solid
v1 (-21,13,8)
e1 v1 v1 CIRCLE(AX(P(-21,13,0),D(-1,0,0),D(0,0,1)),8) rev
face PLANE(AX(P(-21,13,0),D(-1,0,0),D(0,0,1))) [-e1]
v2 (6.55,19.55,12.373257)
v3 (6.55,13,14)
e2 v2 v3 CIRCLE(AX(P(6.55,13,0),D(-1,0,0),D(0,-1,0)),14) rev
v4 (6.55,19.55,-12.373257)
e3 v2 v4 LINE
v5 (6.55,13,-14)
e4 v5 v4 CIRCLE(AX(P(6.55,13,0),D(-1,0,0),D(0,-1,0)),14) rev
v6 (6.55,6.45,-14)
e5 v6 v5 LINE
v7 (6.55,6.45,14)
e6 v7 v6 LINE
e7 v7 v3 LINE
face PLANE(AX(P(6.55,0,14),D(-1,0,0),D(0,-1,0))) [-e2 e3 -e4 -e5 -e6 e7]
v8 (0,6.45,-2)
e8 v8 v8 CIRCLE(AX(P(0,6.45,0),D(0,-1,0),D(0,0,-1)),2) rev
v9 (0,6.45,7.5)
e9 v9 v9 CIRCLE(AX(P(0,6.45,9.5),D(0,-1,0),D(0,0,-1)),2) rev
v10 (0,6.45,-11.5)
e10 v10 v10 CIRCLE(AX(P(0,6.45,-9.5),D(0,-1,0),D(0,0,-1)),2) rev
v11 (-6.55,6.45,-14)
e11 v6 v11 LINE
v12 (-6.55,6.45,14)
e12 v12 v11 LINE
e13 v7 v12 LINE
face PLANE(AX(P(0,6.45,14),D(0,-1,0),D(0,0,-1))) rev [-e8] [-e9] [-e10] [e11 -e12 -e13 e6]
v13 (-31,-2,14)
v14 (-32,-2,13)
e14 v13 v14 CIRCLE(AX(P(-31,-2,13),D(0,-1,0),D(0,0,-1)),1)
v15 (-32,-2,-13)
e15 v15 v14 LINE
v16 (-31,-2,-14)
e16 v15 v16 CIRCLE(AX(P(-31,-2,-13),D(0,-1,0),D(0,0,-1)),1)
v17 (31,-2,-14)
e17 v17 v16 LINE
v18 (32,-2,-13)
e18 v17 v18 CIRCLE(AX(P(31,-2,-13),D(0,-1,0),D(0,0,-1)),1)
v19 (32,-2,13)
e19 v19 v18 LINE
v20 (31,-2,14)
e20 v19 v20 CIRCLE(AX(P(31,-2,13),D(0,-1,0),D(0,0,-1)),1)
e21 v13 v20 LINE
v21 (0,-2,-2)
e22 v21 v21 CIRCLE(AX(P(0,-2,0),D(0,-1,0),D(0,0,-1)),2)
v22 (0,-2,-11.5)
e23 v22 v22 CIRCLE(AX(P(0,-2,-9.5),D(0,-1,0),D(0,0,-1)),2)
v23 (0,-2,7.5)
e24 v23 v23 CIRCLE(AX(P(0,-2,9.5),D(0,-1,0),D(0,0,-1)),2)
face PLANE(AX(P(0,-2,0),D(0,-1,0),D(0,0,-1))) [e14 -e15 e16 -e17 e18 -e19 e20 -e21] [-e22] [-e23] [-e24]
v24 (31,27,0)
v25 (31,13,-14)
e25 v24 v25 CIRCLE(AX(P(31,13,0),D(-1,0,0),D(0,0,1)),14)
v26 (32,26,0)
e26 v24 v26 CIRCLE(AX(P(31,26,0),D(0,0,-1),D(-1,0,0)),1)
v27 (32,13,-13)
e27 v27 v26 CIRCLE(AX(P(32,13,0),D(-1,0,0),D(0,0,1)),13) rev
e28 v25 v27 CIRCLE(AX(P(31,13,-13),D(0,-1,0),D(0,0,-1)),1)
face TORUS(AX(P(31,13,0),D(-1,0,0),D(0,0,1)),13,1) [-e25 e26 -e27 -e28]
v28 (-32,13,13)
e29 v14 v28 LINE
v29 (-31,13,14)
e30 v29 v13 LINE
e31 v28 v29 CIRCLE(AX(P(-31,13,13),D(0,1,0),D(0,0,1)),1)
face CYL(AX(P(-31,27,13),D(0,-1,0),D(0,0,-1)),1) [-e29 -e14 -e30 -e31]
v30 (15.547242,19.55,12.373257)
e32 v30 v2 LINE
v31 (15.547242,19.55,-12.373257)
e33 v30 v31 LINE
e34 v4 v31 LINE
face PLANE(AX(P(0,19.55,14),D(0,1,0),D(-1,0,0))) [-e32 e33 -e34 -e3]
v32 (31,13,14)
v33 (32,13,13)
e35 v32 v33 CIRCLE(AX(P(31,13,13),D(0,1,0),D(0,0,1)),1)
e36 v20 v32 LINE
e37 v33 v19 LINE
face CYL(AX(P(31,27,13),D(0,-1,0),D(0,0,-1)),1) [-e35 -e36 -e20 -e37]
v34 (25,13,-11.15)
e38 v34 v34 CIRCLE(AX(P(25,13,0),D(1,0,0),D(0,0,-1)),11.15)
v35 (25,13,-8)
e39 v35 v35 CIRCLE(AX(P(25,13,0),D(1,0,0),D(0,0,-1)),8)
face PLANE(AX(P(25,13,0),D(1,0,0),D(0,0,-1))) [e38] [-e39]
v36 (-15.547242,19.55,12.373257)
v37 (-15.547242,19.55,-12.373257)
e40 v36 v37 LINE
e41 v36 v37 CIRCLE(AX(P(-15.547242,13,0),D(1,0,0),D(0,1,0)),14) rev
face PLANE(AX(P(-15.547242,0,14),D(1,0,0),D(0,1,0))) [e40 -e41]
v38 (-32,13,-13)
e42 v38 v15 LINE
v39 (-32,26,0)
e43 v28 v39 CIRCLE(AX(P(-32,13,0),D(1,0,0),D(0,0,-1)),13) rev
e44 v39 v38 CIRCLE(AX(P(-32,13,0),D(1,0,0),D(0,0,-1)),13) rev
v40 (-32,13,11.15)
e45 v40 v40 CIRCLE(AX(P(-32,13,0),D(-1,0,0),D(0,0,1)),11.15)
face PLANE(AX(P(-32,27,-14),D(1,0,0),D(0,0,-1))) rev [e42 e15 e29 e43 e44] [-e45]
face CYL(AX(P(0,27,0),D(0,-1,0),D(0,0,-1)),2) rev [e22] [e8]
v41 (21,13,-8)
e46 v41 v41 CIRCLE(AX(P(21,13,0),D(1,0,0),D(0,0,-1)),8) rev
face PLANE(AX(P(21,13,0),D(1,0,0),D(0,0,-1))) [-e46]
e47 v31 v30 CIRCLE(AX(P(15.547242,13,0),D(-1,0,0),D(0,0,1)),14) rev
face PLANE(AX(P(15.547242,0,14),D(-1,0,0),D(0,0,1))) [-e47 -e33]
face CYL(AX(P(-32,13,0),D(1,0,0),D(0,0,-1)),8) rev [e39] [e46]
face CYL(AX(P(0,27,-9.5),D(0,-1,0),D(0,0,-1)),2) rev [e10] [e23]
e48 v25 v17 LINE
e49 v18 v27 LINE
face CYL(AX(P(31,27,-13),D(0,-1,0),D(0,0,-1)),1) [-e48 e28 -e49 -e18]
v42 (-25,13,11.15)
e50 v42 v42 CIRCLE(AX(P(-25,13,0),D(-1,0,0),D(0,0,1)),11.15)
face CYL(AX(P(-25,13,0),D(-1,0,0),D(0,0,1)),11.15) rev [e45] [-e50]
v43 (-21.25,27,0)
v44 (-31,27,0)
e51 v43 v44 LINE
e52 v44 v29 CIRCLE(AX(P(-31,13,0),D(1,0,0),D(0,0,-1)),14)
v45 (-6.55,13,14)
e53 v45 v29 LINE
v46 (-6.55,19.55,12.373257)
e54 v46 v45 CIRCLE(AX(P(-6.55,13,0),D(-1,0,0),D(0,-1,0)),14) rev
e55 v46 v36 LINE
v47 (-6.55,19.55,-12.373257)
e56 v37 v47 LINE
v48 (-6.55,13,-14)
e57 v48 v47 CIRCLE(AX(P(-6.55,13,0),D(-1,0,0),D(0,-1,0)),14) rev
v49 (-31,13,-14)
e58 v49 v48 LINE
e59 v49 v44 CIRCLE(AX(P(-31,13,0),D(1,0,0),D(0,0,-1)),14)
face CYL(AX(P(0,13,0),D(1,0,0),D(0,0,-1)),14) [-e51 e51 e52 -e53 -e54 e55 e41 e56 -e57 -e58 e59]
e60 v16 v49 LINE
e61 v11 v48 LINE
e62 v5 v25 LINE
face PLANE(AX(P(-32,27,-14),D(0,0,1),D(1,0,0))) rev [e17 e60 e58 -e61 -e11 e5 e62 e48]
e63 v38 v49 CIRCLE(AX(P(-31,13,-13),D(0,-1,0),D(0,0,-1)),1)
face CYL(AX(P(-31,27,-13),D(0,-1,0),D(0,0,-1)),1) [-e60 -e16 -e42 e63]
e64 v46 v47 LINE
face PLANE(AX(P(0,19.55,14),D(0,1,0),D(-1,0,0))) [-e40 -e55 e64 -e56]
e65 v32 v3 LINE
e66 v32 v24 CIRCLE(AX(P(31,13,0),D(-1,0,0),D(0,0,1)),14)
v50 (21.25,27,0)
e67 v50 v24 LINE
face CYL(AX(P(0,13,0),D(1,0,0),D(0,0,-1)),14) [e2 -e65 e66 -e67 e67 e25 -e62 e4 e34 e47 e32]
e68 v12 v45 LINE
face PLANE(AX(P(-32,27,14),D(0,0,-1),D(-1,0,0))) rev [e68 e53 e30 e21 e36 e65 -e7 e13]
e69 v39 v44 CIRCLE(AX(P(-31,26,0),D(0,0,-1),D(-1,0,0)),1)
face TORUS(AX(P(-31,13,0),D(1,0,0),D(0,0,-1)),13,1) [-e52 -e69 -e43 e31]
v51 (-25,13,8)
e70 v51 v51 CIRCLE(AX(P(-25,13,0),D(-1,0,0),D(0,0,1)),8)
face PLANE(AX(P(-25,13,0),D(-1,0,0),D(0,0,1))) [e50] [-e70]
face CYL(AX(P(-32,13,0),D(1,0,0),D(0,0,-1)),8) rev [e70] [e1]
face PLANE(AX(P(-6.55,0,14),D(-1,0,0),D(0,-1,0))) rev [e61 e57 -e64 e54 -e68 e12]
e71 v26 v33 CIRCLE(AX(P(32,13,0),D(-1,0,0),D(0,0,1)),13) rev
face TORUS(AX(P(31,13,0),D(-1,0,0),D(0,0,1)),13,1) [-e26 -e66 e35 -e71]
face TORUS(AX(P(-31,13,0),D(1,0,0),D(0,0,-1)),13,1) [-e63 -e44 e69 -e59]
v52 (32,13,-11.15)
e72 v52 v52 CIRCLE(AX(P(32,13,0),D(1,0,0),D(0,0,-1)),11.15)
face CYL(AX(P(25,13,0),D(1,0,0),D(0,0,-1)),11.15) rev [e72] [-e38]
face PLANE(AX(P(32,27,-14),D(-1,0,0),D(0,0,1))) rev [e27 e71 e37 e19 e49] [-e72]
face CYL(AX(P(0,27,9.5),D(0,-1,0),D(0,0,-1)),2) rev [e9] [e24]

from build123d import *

# Parameters (mm, degrees)
SKETCH1_R                       = 26
SKETCH1_R_2                     = 21.249999999999996
BOSS_EXTRUDE1_DEPTH             = 9
BOSS_EXTRUDE2_START             = 2
SKETCH2_R                       = 26.000000000000007
SKETCH2_R_2                     = 21.249999999999996
BOSS_EXTRUDE2_DEPTH             = 2
BOSS_EXTRUDE3_REACH             = 40.38
BOSS_EXTRUDE3_DIRECTION_2_DEPTH = 18
SKETCH4_R                       = 11.15
CUT_EXTRUDE1_DEPTH              = 7
CUT_EXTRUDE2_START              = -7
SKETCH5_R                       = 11.15
CUT_EXTRUDE2_DEPTH              = 7
FILLET2_R                       = 14
FILLET4_R                       = 1
SKETCH8_W                       = 43.8178046004133
SKETCH8_H                       = 27.999999999999993
BOSS_EXTRUDE4_DEPTH             = 11
SKETCH9_W                       = 43.8178046004133
SKETCH9_H                       = 11.999999999999998
CUT_EXTRUDE4_DEPTH              = 45.988887516807985
BOSS_EXTRUDE5_DEPTH             = 42.5
SKETCH6_R                       = 8
CUT_EXTRUDE3_DEPTH              = 65.6065012208524
BOSS_EXTRUDE6_START             = -4
BOSS_EXTRUDE6_DEPTH             = 42
SKETCH11_R                      = 2
CUT_EXTRUDE5_DEPTH              = 46.39823785126468
CUT_EXTRUDE6_DEPTH              = 51.36864114704705


with BuildPart() as part:
    # Sketch1 → Boss-Extrude1 (new body)
    with BuildSketch(Plane(origin=(0, 0, 0), x_dir=(1, 0, 0), z_dir=(0, 1, 0))):
        with Locations(Location((0, 0, 0), (0, 0, 270))):
            Circle(SKETCH1_R)
        with Locations(Location((0, 0, 0), (0, 0, 270))):
            Circle(SKETCH1_R_2, mode=Mode.SUBTRACT)
    extrude(amount=BOSS_EXTRUDE1_DEPTH)

    # Sketch2 → Boss-Extrude2 (add)
    with BuildSketch(Plane.XZ.offset(BOSS_EXTRUDE2_START)):
        with Locations(Location((0, 0, 0), (0, 0, 270))):
            Circle(SKETCH2_R)
        with Locations(Location((0, 0, 0), (0, 0, 270))):
            Circle(SKETCH2_R_2, mode=Mode.SUBTRACT)
    extrude(amount=-BOSS_EXTRUDE2_DEPTH)

    # Boss-Extrude3: up to this face of the body (flat: up to its plane)
    boss_extrude3_end = Plane(part.part.faces().sort_by_distance((0, -2, 25.264608948))[0])
    # Sketch3 → Boss-Extrude3 (add, up to the picked face)
    with BuildSketch(Plane(origin=(0, 9, 0), x_dir=(1, 0, 0), z_dir=(0, 1, 0)), mode=Mode.PRIVATE) as boss_extrude3_sk1:
        Polygon((21.249999999999996, 14.000000000000002), (32, 14.000000000000002), (32.00000000000001, -13.999999999999998), (21.250000000000004, -13.999999999999998), align=None)
    boss_extrude3_tool1 = split(extrude(boss_extrude3_sk1.sketch, amount=-BOSS_EXTRUDE3_REACH, mode=Mode.PRIVATE), bisect_by=boss_extrude3_end, keep=Keep.BOTH, mode=Mode.PRIVATE)
    # Sketch3 → Boss-Extrude3 (add, up to the picked face)
    with BuildSketch(Plane(origin=(0, 9, 0), x_dir=(1, 0, 0), z_dir=(0, 1, 0)), mode=Mode.PRIVATE) as boss_extrude3_sk2:
        Polygon((-32, 13.999999999999995), (-21.25, 13.999999999999995), (-21.250000000000004, -14.000000000000005), (-32, -14.000000000000004), align=None)
    boss_extrude3_tool2 = split(extrude(boss_extrude3_sk2.sketch, amount=-BOSS_EXTRUDE3_REACH, mode=Mode.PRIVATE), bisect_by=boss_extrude3_end, keep=Keep.BOTH, mode=Mode.PRIVATE)
    add(boss_extrude3_tool1.solids().sort_by(Axis((26.625, 9, 0), (0, -1, 0)))[0])
    add(boss_extrude3_tool2.solids().sort_by(Axis((-26.625, 9, 0), (0, -1, 0)))[0])

    # Sketch3 → Boss-Extrude3 direction 2 (add)
    with BuildSketch(Plane(origin=(0, 9, 0), x_dir=(1, 0, 0), z_dir=(0, 1, 0))):
        Polygon((21.249999999999996, 14.000000000000002), (32, 14.000000000000002), (32.00000000000001, -13.999999999999998), (21.250000000000004, -13.999999999999998), align=None)
        Polygon((-32, 13.999999999999995), (-21.25, 13.999999999999995), (-21.250000000000004, -14.000000000000005), (-32, -14.000000000000004), align=None)
    extrude(amount=BOSS_EXTRUDE3_DIRECTION_2_DEPTH)

    # Sketch4 → Cut-Extrude1 (cut)
    with BuildSketch(Plane(origin=(32.00000000000001, 0, -7.93e-15), x_dir=(-2.8e-16, 0, -1), z_dir=(1, 0, -2.8e-16))):
        with Locations((0, 12.999999999999998)):
            Circle(SKETCH4_R)
    extrude(amount=-CUT_EXTRUDE1_DEPTH, mode=Mode.SUBTRACT)

    # Sketch5 → Cut-Extrude2 (cut)
    with BuildSketch(Plane.ZY.offset(32).offset(CUT_EXTRUDE2_START)):
        with Locations(Location((-7.93e-15, 12.999999999999998, 0), (0, 0, 180))):
            Circle(SKETCH5_R)
    extrude(amount=CUT_EXTRUDE2_DEPTH, mode=Mode.SUBTRACT)

    # Fillet2
    fillet2_edges = [part.edges().sort_by_distance(p)[0] for p in [
        (-26.625, 27, 14.000000000000004),
        (-26.625, 27, -13.999999999999995),
        (26.625, 27, -14.000000000000002),
        (26.625000000000007, 27, 13.999999999999998),
    ]]
    fillet(fillet2_edges, radius=FILLET2_R - 0.0001)  # a hair under: the kernel refuses the full size

    # Fillet4
    fillet4_edges = [part.edges().sort_by_distance(p)[0] for p in [
        (-32, 3.5, 14.000000000000004),
        (-32, 3.5, -13.999999999999995),
        (-32, 22.89952422593355, -9.899524225933543),
        (-32, 22.899524225933547, 9.899524225933554),
        (32, 5.500050000000002, -14.000000000000004),
        (32.00000000000001, 5.500050000000002, 14),
        (32, 22.899524225933547, 9.89952422593355),
        (32, 22.89952422593355, -9.89952422593355),
    ]]
    fillet(fillet4_edges, radius=FILLET4_R)

    # Sketch8 → Boss-Extrude4 (add)
    with BuildSketch(Plane.XZ.offset(2)):
        Rectangle(SKETCH8_W, SKETCH8_H)
    extrude(amount=-BOSS_EXTRUDE4_DEPTH)

    # Sketch9 → Cut-Extrude4 (cut, through all)
    with BuildSketch(Plane(origin=(0, 9, 0), x_dir=(1, 0, 0), z_dir=(0, 1, 0))):
        Polygon((21.90890230020665, 14.000000000000002), (-21.908902300206655, 14.000000000000002), (-21.908902300206652, 25.999999999999996), (21.908902300206652, 25.999999999999996), align=None)
        with Locations((0, -20.000000000000004)):
            Rectangle(SKETCH9_W, SKETCH9_H)
    extrude(amount=-CUT_EXTRUDE4_DEPTH, mode=Mode.SUBTRACT)

    # Sketch12 → Boss-Extrude5 (add)
    with BuildSketch(Plane.ZY.offset(-21.25)):
        with BuildLine():
            Line((-13.999999999999996, 12.999999999999998), (-13.999999999999996, 9.000000000000002))
            Line((-13.999999999999996, 9.000000000000002), (14.00000000000001, 9))
            Line((14.00000000000001, 9), (14.000000000000004, 12.999999999999996))
            ThreePointArc((14.000000000000004, 12.999999999999996), (9.89949493661167, 22.89949493661166), (6.12e-15, 26.999999999999996))
            ThreePointArc((6.12e-15, 26.999999999999996), (-9.899494936611658, 22.89949493661166), (-13.999999999999996, 12.999999999999998))
        make_face()
    extrude(amount=BOSS_EXTRUDE5_DEPTH)

    # Sketch6 → Cut-Extrude3 (cut, through all)
    with BuildSketch(Plane(origin=(25.000000000000007, 0, -6.94e-15), x_dir=(-2.8e-16, 0, -1), z_dir=(1, 0, -2.8e-16))):
        with Locations((0, 12.999999999999998)):
            Circle(SKETCH6_R)
    extrude(amount=-CUT_EXTRUDE3_DEPTH, mode=Mode.SUBTRACT)

    # Sketch14 → Boss-Extrude6 (add)
    with BuildSketch(Plane(origin=(25.000000000000007, 0, -6.94e-15), x_dir=(-2.8e-16, 0, -1), z_dir=(1, 0, -2.8e-16)).offset(BOSS_EXTRUDE6_START)):
        with BuildLine():
            Line((-14.000000000000007, -2.0000000000000018), (-14.000000000000007, 12.999999999999996))
            ThreePointArc((-14.000000000000007, 12.999999999999996), (-9.899494936611672, 22.89949493661166), (-8.6e-15, 26.999999999999996))
            ThreePointArc((-8.6e-15, 26.999999999999996), (9.899494936611658, 22.89949493661166), (13.999999999999993, 12.999999999999996))
            Line((13.999999999999993, 12.999999999999996), (13.999999999999993, -2.0000000000000018))
            Line((13.999999999999993, -2.0000000000000018), (-14.000000000000007, -2.0000000000000018))
        make_face()
    extrude(amount=-BOSS_EXTRUDE6_DEPTH)

    # Sketch11 → Cut-Extrude5 (cut, through all)
    with BuildSketch(Plane.XZ.offset(2)):
        with Locations(Location((0, -9.5, 0), (0, 0, 270))):
            Circle(SKETCH11_R)
        with Locations(Location((0, 9.5, 0), (0, 0, 270))):
            Circle(SKETCH11_R)
        with Locations(Location((1.73e-15, -3.47e-15, 0), (0, 0, 270))):
            Circle(SKETCH11_R)
    extrude(amount=-CUT_EXTRUDE5_DEPTH, mode=Mode.SUBTRACT)

    # Sketch13 → Cut-Extrude6 (cut, through all)
    with BuildSketch(Plane(origin=(0, 0, -13.999999999999995), x_dir=(-1, 0, 0), z_dir=(0, 0, -1))):
        Polygon((15.547241809262866, 33.06287004539835), (15.54724180926287, 19.549999999999997), (0, 19.549999999999997), (-15.54724180926287, 19.549999999999994), (-15.54724180926287, 33.06287004539835), align=None)
        Polygon((6.549999999999999, 19.549999999999997), (0, 19.549999999999997), (-6.550000000000001, 19.549999999999997), (-6.55, 12.999999999999996), (6.550000000000001, 12.999999999999996), align=None)
        Polygon((6.550000000000001, 6.4499999999999975), (6.55, 12.999999999999996), (-6.549999999999997, 12.999999999999996), (-6.549999999999999, 6.4499999999999975), align=None)
    extrude(amount=-CUT_EXTRUDE6_DEPTH, mode=Mode.SUBTRACT)


solid = part.part
